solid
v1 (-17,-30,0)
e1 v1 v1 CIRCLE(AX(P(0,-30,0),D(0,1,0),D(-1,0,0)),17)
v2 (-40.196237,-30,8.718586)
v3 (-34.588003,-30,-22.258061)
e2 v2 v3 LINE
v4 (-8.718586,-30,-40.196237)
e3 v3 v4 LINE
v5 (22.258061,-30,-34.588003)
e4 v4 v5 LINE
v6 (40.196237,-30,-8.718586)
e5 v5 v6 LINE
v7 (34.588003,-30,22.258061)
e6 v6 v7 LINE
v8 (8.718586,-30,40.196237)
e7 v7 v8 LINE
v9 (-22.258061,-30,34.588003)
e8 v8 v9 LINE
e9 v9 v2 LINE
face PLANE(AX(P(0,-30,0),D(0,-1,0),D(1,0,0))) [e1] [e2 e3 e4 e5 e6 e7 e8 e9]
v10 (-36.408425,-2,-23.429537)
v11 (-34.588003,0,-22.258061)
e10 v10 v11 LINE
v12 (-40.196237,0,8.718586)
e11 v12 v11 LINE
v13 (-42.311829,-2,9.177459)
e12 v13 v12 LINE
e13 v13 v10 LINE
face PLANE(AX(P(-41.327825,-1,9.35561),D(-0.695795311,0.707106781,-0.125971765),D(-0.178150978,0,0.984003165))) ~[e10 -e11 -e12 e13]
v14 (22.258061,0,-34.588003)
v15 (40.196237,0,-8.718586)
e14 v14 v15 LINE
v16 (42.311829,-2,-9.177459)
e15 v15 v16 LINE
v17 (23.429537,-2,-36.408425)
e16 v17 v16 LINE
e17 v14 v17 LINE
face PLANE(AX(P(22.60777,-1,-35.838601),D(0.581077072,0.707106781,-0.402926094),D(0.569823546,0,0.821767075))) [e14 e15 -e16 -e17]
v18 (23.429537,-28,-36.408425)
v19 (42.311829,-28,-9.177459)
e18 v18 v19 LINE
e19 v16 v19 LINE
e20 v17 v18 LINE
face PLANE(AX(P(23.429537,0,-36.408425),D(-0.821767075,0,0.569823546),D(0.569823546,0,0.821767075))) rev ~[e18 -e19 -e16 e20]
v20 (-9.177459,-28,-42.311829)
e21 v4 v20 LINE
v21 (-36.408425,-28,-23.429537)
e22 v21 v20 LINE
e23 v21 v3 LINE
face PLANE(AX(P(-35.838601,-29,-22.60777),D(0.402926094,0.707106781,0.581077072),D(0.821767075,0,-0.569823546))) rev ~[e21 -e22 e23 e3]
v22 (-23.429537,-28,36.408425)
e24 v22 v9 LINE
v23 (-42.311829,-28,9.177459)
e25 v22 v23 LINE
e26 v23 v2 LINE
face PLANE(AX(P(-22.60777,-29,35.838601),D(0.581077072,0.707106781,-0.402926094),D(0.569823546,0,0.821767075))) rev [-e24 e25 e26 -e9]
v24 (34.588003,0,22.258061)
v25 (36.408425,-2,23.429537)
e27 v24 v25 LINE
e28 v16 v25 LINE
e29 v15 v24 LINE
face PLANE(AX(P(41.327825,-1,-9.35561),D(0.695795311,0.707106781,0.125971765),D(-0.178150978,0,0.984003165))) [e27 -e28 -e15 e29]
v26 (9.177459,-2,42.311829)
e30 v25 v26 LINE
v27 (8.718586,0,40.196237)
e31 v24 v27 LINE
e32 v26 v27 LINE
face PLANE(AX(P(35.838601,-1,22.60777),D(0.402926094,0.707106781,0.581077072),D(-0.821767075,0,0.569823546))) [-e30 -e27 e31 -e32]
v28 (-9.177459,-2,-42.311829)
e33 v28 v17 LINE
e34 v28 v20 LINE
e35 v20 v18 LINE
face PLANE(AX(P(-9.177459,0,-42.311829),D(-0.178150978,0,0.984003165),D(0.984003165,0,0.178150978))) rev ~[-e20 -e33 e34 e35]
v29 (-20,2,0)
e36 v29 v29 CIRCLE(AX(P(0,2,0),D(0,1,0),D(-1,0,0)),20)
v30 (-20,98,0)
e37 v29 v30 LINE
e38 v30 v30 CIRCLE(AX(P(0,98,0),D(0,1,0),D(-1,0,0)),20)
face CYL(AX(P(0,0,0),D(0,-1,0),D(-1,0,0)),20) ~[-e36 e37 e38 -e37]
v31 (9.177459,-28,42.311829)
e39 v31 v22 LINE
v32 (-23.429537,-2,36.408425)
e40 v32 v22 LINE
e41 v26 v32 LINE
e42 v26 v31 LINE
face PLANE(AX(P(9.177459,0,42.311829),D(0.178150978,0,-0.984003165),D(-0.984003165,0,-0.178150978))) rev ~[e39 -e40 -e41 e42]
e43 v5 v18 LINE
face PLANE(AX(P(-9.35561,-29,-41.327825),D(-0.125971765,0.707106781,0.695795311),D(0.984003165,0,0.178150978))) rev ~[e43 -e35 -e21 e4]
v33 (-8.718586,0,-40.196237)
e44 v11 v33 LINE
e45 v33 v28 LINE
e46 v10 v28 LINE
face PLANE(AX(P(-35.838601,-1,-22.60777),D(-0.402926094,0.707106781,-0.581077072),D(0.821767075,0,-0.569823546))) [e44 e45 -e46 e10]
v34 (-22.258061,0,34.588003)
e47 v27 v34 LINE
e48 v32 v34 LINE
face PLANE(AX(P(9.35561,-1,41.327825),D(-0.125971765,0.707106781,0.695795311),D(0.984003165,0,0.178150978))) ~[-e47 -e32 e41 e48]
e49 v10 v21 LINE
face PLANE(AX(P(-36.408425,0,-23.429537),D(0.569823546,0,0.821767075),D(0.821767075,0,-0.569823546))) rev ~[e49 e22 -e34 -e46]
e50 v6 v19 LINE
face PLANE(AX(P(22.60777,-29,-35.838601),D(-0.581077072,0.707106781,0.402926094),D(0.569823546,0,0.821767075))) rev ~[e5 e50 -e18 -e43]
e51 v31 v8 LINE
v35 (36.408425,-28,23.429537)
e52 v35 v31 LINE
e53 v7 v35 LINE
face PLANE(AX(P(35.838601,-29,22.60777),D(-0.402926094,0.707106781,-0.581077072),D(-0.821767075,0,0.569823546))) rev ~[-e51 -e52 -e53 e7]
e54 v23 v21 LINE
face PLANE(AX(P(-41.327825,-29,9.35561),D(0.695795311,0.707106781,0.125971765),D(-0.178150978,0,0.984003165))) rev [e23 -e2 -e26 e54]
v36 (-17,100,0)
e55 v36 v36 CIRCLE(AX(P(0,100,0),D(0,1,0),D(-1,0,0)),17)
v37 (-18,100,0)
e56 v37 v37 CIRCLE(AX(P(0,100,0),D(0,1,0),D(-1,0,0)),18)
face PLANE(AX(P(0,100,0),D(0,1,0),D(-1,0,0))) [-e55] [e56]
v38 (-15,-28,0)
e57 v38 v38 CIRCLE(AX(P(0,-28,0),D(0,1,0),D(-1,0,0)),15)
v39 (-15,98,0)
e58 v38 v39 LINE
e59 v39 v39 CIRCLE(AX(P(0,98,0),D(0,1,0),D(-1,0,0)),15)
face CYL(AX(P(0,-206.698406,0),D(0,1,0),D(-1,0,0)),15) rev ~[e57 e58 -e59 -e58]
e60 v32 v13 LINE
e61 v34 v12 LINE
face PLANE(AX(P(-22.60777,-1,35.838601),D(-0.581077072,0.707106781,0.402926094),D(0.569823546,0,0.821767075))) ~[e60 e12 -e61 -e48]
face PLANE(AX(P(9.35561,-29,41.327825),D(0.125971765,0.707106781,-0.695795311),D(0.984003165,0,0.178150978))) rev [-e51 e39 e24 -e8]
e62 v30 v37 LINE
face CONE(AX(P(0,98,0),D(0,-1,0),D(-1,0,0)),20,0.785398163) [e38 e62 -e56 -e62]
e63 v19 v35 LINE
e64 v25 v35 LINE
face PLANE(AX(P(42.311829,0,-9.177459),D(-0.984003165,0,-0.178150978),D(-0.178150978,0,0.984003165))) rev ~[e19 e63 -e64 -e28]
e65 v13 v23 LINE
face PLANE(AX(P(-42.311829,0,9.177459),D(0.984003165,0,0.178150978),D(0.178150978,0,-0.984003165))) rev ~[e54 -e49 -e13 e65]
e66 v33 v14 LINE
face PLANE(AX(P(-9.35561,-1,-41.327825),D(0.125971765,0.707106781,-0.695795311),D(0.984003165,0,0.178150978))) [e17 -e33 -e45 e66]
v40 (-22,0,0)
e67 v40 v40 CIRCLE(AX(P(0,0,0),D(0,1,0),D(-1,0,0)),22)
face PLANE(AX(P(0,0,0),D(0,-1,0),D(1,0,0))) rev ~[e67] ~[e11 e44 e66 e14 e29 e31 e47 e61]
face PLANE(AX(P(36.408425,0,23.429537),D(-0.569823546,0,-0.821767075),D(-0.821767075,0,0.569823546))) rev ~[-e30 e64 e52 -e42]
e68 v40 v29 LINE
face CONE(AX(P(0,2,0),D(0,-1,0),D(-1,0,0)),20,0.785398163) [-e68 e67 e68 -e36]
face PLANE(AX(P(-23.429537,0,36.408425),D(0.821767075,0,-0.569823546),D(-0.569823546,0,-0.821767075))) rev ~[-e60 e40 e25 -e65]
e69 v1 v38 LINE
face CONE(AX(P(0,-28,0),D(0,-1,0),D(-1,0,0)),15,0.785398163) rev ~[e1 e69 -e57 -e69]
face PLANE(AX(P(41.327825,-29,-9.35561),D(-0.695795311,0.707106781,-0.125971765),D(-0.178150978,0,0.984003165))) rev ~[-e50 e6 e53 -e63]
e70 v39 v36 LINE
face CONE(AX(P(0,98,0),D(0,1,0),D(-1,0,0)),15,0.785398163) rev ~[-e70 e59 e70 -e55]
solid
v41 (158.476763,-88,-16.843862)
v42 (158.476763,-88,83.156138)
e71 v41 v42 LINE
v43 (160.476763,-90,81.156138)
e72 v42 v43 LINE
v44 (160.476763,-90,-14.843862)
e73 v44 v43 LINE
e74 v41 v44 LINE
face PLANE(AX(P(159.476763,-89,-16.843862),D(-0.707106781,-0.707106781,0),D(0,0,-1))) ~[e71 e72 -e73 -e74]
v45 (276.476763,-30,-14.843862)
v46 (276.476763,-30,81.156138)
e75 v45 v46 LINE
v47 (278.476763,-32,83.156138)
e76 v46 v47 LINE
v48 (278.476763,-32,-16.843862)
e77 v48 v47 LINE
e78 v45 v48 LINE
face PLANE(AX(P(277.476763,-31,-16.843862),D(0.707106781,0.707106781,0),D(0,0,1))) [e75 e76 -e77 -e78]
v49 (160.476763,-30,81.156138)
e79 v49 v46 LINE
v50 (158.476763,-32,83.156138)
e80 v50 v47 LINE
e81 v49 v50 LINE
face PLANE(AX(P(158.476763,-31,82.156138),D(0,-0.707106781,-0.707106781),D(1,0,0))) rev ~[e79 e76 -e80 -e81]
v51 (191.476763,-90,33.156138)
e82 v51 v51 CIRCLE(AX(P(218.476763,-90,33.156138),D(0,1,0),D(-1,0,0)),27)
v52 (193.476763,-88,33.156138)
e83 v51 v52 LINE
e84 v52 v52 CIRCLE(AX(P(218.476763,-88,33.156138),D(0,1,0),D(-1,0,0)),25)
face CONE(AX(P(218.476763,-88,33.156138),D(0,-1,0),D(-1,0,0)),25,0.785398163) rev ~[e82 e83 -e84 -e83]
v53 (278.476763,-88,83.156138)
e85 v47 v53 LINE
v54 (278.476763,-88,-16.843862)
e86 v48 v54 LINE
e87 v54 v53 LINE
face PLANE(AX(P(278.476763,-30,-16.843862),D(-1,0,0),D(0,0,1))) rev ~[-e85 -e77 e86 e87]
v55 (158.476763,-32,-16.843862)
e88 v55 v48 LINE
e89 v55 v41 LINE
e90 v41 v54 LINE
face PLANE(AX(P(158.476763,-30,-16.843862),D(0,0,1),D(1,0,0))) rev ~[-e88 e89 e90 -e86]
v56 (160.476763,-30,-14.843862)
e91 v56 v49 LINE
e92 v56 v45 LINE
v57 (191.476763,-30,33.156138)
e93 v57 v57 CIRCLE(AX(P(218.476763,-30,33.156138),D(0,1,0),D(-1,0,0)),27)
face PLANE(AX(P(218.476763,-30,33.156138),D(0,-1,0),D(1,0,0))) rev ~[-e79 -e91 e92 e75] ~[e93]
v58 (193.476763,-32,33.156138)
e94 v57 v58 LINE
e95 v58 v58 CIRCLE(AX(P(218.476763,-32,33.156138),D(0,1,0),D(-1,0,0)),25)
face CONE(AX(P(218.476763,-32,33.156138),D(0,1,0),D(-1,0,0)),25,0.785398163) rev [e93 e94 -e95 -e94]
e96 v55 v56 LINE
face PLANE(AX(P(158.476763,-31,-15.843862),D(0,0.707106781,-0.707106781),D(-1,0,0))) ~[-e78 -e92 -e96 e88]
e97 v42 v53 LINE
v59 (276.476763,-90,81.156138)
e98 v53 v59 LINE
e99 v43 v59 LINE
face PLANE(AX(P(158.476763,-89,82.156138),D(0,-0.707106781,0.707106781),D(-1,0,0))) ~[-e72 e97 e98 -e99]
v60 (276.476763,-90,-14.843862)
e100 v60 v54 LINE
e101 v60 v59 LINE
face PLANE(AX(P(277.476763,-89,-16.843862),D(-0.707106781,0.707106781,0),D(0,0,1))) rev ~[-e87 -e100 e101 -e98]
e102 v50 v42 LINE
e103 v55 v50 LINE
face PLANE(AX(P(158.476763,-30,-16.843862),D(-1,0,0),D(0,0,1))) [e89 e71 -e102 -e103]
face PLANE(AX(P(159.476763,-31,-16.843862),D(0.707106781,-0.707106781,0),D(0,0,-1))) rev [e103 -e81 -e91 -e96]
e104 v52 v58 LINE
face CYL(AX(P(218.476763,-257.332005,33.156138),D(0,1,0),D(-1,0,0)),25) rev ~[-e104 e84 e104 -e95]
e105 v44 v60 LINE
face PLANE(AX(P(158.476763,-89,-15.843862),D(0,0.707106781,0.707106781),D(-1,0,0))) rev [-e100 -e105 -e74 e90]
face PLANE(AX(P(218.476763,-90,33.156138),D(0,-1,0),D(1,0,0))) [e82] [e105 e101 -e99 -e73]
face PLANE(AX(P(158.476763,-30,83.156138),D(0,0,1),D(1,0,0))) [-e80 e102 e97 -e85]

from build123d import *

# Parameters (mm, degrees)
F1_DEPTH = 30
F2_R     = 20
F3_DEPTH = 100
F5_D     = 30
F6_SIZE  = 2
F7_W     = 120
F7_H     = 100
F8_DEPTH = 60
F10_D    = 50
F11_SIZE = 2
F12_SIZE = 2


# Not quite as in the source:
# - a feature of the source that left no trace in its solid (it failed there, or was rolled back) is left out


with BuildPart() as f1:
    # F0 (on Front) → F1 (new body)
    with BuildSketch(Plane.XZ):
        Polygon((-23.4295373742, 36.4084245586), (-42.311828655, 9.1774591404), (-36.4084245586, -23.4295373742), (-9.1774591404, -42.311828655), (23.4295373742, -36.4084245586), (42.311828655, -9.1774591404), (36.4084245586, 23.4295373742), (9.1774591404, 42.311828655), align=None)
    extrude(amount=F1_DEPTH)

    # F2 (on face) → F3 (join)
    with BuildSketch(Plane(origin=(0, 0, 0), x_dir=(-1, 0, 0), z_dir=(0, 1, 0))):
        Circle(F2_R)
    extrude(amount=F3_DEPTH)

    # F5 (through all)
    with Locations(Plane.XZ.offset(30)):
        with Locations((0, 0)):
            Hole(F5_D / 2)

    # F6
    f6_edges = [f1.edges().sort_by_distance(p)[0] for p in [
        (20, 100, 0),
        (-7.126039, 0, 39.360127),
        (-7.126039, -30, 39.360127),
        (22.792942, 0, 32.870683),
        (22.792942, -30, 32.870683),
        (-32.870683, 0, 22.792942),
        (-32.870683, -30, 22.792942),
        (39.360127, 0, 7.126039),
        (-39.360127, 0, -7.126039),
        (32.870683, 0, -22.792942),
        (-22.792942, 0, -32.870683),
        (7.126039, 0, -39.360127),
        (20, 0, 0),
        (39.360127, -30, 7.126039),
        (-39.360127, -30, -7.126039),
        (32.870683, -30, -22.792942),
        (-22.792942, -30, -32.870683),
        (7.126039, -30, -39.360127),
        (-15, -30, 0),
        (-15, 100, 0),
    ]]
    chamfer(f6_edges, length=F6_SIZE)


with BuildPart() as f8:
    # F7 (on face) → F8 (new body)
    with BuildSketch(Plane.XZ.offset(30)):
        with Locations((218.4767627038, 33.1561379135)):
            Rectangle(F7_W, F7_H)
    extrude(amount=F8_DEPTH)

    # F10 (through all)
    with Locations(Plane.XZ.offset(90)):
        with Locations((218.4767627038, 33.1561379135)):
            Hole(F10_D / 2)

    # F11
    f11_edges = [f8.edges().sort_by_distance(p)[0] for p in [
        (218.476763, -90, 83.156138),
        (278.476763, -90, 33.156138),
        (158.476763, -90, 33.156138),
        (218.476763, -90, -16.843862),
        (193.476763, -90, 33.156138),
    ]]
    chamfer(f11_edges, length=F11_SIZE)

    # F12
    f12_edges = [f8.edges().sort_by_distance(p)[0] for p in [
        (218.476763, -30, 83.156138),
        (278.476763, -30, 33.156138),
        (158.476763, -30, 33.156138),
        (218.476763, -30, -16.843862),
        (193.476763, -30, 33.156138),
    ]]
    chamfer(f12_edges, length=F12_SIZE)


solid = Compound([f1.part, f8.part])
